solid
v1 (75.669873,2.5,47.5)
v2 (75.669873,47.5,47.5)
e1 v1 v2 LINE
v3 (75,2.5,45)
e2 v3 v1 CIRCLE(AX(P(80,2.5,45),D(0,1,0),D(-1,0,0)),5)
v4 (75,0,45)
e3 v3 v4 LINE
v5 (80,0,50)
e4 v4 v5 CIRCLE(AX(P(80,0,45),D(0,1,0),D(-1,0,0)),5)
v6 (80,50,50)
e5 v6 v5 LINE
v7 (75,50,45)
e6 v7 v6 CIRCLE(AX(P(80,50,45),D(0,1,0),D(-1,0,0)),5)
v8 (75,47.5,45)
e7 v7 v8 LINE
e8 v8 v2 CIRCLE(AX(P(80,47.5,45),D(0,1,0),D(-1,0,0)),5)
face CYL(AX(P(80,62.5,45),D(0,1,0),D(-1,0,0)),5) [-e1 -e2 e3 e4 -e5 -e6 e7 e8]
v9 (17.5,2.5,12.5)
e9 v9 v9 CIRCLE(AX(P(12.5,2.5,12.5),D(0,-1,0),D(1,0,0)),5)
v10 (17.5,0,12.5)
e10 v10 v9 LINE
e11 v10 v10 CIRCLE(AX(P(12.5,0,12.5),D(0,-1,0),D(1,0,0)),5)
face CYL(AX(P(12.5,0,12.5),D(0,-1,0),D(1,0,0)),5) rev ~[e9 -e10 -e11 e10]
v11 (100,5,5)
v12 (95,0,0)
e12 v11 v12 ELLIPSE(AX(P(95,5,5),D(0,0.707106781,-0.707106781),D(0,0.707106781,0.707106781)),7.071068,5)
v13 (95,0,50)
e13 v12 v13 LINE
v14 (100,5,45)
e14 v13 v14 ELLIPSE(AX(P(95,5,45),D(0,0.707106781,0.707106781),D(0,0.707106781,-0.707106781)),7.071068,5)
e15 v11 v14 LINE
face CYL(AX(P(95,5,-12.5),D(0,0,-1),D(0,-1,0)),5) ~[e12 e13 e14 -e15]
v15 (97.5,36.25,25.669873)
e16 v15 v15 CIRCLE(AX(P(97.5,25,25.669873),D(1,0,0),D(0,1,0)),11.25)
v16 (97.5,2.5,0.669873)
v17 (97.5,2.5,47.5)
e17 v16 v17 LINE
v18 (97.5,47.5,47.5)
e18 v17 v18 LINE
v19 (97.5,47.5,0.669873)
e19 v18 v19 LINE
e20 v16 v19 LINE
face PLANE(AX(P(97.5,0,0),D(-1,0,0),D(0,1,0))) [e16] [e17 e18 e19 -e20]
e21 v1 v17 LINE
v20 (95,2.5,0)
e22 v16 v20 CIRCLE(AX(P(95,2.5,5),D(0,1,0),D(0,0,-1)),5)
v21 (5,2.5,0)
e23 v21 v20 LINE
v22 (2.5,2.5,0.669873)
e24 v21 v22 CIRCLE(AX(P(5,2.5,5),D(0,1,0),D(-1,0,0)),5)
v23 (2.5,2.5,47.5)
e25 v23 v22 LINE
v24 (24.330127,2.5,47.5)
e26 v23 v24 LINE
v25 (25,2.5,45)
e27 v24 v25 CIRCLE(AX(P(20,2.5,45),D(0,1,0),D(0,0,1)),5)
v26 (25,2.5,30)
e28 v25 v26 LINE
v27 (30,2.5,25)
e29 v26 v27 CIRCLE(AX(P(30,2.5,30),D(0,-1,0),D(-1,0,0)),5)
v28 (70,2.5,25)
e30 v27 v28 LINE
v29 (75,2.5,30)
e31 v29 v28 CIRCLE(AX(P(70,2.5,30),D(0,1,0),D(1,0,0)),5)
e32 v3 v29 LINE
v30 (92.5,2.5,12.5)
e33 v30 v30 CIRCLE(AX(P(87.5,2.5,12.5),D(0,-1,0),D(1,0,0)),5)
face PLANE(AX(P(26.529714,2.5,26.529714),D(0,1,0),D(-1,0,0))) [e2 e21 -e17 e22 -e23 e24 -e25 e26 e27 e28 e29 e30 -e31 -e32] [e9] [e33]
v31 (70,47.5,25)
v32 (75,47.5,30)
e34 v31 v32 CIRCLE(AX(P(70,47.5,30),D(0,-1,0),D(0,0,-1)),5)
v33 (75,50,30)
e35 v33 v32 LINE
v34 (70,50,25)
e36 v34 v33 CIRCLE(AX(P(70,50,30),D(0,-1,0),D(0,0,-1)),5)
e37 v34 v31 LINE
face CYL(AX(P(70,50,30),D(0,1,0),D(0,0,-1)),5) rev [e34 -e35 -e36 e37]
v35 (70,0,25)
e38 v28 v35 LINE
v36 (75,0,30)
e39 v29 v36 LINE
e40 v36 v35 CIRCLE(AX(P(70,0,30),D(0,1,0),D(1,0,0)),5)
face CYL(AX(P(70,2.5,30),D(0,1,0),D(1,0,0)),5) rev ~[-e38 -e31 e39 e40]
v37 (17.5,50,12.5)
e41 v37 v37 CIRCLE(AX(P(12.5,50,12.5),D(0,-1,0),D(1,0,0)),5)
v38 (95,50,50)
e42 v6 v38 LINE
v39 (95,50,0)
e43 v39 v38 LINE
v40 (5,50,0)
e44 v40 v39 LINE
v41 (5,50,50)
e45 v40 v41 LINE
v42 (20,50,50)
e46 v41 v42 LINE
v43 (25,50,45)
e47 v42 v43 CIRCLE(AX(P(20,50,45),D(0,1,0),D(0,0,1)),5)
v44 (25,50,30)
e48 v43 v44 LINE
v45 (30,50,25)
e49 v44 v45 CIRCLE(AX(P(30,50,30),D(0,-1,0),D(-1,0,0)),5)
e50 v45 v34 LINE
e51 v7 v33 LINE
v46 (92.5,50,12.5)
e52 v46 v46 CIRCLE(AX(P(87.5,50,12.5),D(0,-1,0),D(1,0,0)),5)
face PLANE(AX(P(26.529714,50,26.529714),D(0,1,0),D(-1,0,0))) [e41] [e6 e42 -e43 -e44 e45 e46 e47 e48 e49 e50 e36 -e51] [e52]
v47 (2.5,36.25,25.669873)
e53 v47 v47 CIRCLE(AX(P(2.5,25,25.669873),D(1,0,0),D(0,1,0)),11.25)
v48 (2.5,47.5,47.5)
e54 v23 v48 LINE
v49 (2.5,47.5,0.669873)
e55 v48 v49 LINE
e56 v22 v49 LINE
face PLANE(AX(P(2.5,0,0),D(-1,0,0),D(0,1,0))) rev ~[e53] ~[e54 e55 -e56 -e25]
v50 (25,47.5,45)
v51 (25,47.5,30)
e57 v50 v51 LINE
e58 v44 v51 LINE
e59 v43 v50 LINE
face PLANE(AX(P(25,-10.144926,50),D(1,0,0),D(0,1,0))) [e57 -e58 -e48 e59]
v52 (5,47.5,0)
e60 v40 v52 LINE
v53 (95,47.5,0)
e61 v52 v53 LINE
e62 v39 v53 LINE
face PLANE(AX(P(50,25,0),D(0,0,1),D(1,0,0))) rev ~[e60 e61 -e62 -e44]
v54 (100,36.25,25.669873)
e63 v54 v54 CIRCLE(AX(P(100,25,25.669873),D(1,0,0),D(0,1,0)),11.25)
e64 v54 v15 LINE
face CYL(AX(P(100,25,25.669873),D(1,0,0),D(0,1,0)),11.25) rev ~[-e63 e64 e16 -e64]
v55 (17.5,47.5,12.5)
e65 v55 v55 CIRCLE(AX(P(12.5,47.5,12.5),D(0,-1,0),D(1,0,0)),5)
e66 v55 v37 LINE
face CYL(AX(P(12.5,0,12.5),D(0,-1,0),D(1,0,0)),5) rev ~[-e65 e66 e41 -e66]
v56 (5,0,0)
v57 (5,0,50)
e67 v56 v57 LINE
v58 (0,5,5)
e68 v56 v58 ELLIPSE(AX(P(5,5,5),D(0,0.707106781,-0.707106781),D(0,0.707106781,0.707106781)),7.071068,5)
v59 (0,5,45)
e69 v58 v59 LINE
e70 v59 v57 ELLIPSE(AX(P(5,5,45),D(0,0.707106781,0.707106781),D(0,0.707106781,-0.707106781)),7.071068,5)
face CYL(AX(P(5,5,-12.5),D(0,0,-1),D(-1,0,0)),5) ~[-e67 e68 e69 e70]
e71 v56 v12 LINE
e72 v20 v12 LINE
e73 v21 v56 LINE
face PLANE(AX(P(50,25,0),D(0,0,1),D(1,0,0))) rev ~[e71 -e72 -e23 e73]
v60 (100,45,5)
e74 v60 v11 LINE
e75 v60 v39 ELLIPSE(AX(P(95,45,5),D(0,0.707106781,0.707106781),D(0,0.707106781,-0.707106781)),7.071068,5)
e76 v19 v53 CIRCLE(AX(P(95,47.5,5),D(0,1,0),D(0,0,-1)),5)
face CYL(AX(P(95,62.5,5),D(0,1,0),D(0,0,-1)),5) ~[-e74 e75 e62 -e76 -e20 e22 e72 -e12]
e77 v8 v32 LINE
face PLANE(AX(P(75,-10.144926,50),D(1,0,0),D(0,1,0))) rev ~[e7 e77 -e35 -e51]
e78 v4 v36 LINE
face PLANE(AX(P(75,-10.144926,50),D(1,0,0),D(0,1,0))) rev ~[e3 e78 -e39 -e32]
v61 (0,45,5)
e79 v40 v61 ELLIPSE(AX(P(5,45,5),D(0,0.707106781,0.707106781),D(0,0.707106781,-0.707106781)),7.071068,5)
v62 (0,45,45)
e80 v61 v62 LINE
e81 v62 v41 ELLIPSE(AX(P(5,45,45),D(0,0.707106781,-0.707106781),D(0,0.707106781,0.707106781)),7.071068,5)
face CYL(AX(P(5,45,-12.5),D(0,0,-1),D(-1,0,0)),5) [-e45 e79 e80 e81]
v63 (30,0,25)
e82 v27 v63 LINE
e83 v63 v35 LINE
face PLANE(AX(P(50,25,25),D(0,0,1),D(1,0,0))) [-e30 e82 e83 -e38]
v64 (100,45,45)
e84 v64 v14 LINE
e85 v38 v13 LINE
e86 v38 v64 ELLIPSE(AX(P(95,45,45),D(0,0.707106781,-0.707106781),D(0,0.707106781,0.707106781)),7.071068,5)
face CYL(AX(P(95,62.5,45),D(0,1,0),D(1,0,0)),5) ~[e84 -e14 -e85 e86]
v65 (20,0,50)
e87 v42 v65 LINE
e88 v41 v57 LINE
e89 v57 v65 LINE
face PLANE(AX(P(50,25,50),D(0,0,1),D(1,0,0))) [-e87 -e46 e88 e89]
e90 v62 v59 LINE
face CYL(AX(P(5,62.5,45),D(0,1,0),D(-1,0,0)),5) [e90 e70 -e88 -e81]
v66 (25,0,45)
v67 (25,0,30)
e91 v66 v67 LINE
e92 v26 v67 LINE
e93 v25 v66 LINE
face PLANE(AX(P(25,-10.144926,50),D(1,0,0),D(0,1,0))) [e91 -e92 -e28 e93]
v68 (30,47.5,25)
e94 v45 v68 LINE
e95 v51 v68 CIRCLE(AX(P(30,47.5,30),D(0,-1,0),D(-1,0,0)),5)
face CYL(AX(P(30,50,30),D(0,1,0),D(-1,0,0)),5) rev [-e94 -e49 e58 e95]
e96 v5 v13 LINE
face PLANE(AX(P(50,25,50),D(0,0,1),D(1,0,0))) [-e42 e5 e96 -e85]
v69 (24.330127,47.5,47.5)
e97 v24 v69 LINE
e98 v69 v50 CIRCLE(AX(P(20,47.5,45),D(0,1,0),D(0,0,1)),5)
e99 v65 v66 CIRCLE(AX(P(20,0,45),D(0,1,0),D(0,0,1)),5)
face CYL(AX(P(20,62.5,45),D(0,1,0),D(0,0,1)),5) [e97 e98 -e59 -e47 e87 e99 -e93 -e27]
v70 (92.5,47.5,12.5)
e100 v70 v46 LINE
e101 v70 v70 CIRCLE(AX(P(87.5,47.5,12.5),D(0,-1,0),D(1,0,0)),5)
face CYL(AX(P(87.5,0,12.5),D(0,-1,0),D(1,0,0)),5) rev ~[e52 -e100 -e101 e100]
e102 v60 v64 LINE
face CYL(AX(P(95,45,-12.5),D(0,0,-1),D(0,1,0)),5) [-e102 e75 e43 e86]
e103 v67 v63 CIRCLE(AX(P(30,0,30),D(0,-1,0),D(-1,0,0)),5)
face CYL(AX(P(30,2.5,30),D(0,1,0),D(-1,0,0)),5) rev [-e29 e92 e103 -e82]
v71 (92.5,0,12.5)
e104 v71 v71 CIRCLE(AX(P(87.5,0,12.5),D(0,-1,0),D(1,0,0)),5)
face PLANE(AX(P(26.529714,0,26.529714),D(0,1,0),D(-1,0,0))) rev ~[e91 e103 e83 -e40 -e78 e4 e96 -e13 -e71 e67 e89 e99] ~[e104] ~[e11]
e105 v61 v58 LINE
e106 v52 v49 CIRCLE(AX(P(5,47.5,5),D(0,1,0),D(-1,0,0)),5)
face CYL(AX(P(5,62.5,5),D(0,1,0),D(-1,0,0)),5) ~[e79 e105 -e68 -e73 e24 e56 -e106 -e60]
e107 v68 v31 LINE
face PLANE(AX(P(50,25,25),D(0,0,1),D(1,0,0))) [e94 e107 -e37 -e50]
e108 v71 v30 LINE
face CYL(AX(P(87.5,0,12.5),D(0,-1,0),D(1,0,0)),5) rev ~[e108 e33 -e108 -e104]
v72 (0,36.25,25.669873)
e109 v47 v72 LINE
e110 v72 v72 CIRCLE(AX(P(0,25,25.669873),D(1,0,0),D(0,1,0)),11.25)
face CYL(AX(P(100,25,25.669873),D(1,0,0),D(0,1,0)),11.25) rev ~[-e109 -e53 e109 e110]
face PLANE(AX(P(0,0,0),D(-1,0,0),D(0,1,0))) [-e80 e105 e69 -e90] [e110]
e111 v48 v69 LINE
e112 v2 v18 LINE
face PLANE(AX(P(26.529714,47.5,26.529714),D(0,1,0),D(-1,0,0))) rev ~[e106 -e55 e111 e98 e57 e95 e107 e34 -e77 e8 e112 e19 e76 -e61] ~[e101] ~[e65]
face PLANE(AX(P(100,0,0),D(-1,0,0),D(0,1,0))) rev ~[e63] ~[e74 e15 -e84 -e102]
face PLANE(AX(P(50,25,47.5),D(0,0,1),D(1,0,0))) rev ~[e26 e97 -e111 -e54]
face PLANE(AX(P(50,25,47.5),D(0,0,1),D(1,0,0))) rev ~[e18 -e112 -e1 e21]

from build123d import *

# Parameters (mm, degrees)
F0_W        = 100
F0_H        = 50
F1_DEPTH    = 50
F2_T        = -2.5
F3_W        = 50
F3_H        = 70.2898527046
F4_DEPTH    = 25
F5_R        = 5
F6_DEPTH    = 50
F7_T1_DEPTH = 75
F7_T3_DEPTH = 75
F8_T1_DEPTH = 2.5
F8_T3_DEPTH = 2.5
F8_T5_DEPTH = 75
F9_T1_DEPTH = 75
F9_T3_DEPTH = 75
F10_R       = 11.25
F11_DEPTH   = 100


# Not quite as in the source:
# - a fillet or chamfer that OpenCascade refuses, or shapes differently, is made with other operations: its cross-section is extruded or revolved along the edge and cut away or added


with BuildPart() as f1:
    # F0 (on Top) → F1 (new body)
    with BuildSketch(Plane.XY):
        with Locations((50, 25)):
            Rectangle(F0_W, F0_H)
    extrude(amount=F1_DEPTH)

    # F2
    f2_openings = [f1.faces().sort_by_distance(p)[0] for p in [
        (50, 25, 0),
    ]]
    offset(amount=F2_T, openings=f2_openings)

    # F3 (on face) → F4 (cut)
    with BuildSketch(Plane.XY.offset(50)):
        with Locations((50, 24.9999999069)):
            Rectangle(F3_W, F3_H)
    extrude(amount=-F4_DEPTH, mode=Mode.SUBTRACT)

    # F5 (on face) → F6 (cut)
    with BuildSketch(Plane.XZ):
        with Locations((12.5, 12.5)):
            Circle(F5_R)
        with Locations((87.5, 12.5)):
            Circle(F5_R)
    extrude(amount=-F6_DEPTH, mode=Mode.SUBTRACT)

    # F7: fillet of radius 5 on 4 edges, made by hand

    # F7_s2 → F7_t1 (cut)
    with BuildSketch(Plane.XZ.offset(-62.5)):
        with BuildLine():
            ThreePointArc((0, 45), (1.4644660941, 48.5355339059), (5, 50))
            Line((5, 50), (0, 50))
            Line((0, 50), (0, 45))
        make_face()
        with BuildLine():
            ThreePointArc((0, 5), (1.4644660941, 1.4644660941), (5, 0))
            Line((5, 0), (0, 0))
            Line((0, 0), (0, 5))
        make_face()
    extrude(amount=F7_T1_DEPTH, mode=Mode.SUBTRACT)

    # F7_s4 → F7_t3 (cut)
    with BuildSketch(Plane.XY.offset(-12.5)):
        with BuildLine():
            ThreePointArc((0, 5), (1.4644660941, 1.4644660941), (5, 0))
            Line((5, 0), (0, 0))
            Line((0, 0), (0, 5))
        make_face()
        with BuildLine():
            ThreePointArc((0, 45), (1.4644660941, 48.5355339059), (5, 50))
            Line((5, 50), (0, 50))
            Line((0, 50), (0, 45))
        make_face()
    extrude(amount=F7_T3_DEPTH, mode=Mode.SUBTRACT)

    # F8: fillet of radius 5 on 6 edges, made by hand

    # F8_s2 → F8_t1 (join)
    with BuildSketch(Plane.XZ.offset(-2.5)):
        with BuildLine():
            ThreePointArc((25, 30), (26.4644660941, 26.4644660941), (30, 25))
            Line((30, 25), (25, 25))
            Line((25, 25), (25, 30))
        make_face()
        with BuildLine():
            ThreePointArc((75, 30), (73.5355339059, 26.4644660941), (70, 25))
            Line((70, 25), (75, 25))
            Line((75, 25), (75, 30))
        make_face()
    extrude(amount=F8_T1_DEPTH)

    # F8_s4 → F8_t3 (join)
    with BuildSketch(Plane.XZ.offset(-50)):
        with BuildLine():
            ThreePointArc((25, 30), (26.4644660941, 26.4644660941), (30, 25))
            Line((30, 25), (25, 25))
            Line((25, 25), (25, 30))
        make_face()
        with BuildLine():
            ThreePointArc((70, 25), (73.5355339059, 26.4644660941), (75, 30))
            Line((75, 30), (75, 25))
            Line((75, 25), (70, 25))
        make_face()
    extrude(amount=F8_T3_DEPTH)

    # F8_s6 → F8_t5 (cut)
    with BuildSketch(Plane.XZ.offset(-62.5)):
        with BuildLine():
            ThreePointArc((20, 50), (23.5355339059, 48.5355339059), (25, 45))
            Line((25, 45), (25, 50))
            Line((25, 50), (20, 50))
        make_face()
        with BuildLine():
            ThreePointArc((75, 45), (76.4644660941, 48.5355339059), (80, 50))
            Line((80, 50), (75, 50))
            Line((75, 50), (75, 45))
        make_face()
    extrude(amount=F8_T5_DEPTH, mode=Mode.SUBTRACT)

    # F9: fillet of radius 5 on 4 edges, made by hand

    # F9_s2 → F9_t1 (cut)
    with BuildSketch(Plane.XZ.offset(-62.5)):
        with BuildLine():
            ThreePointArc((100, 45), (98.5355339059, 48.5355339059), (95, 50))
            Line((95, 50), (100, 50))
            Line((100, 50), (100, 45))
        make_face()
        with BuildLine():
            ThreePointArc((95, 0), (98.5355339059, 1.4644660941), (100, 5))
            Line((100, 5), (100, 0))
            Line((100, 0), (95, 0))
        make_face()
    extrude(amount=F9_T1_DEPTH, mode=Mode.SUBTRACT)

    # F9_s4 → F9_t3 (cut)
    with BuildSketch(Plane.XY.offset(-12.5)):
        with BuildLine():
            ThreePointArc((95, 0), (98.5355339059, 1.4644660941), (100, 5))
            Line((100, 5), (100, 0))
            Line((100, 0), (95, 0))
        make_face()
        with BuildLine():
            ThreePointArc((95, 50), (98.5355339059, 48.5355339059), (100, 45))
            Line((100, 45), (100, 50))
            Line((100, 50), (95, 50))
        make_face()
    extrude(amount=F9_T3_DEPTH, mode=Mode.SUBTRACT)

    # F10 (on face) → F11 (cut)
    with BuildSketch(Plane.YZ.offset(100)):
        with Locations((25, 25.6698729811)):
            Circle(F10_R)
    extrude(amount=-F11_DEPTH, mode=Mode.SUBTRACT)


solid = f1.part
